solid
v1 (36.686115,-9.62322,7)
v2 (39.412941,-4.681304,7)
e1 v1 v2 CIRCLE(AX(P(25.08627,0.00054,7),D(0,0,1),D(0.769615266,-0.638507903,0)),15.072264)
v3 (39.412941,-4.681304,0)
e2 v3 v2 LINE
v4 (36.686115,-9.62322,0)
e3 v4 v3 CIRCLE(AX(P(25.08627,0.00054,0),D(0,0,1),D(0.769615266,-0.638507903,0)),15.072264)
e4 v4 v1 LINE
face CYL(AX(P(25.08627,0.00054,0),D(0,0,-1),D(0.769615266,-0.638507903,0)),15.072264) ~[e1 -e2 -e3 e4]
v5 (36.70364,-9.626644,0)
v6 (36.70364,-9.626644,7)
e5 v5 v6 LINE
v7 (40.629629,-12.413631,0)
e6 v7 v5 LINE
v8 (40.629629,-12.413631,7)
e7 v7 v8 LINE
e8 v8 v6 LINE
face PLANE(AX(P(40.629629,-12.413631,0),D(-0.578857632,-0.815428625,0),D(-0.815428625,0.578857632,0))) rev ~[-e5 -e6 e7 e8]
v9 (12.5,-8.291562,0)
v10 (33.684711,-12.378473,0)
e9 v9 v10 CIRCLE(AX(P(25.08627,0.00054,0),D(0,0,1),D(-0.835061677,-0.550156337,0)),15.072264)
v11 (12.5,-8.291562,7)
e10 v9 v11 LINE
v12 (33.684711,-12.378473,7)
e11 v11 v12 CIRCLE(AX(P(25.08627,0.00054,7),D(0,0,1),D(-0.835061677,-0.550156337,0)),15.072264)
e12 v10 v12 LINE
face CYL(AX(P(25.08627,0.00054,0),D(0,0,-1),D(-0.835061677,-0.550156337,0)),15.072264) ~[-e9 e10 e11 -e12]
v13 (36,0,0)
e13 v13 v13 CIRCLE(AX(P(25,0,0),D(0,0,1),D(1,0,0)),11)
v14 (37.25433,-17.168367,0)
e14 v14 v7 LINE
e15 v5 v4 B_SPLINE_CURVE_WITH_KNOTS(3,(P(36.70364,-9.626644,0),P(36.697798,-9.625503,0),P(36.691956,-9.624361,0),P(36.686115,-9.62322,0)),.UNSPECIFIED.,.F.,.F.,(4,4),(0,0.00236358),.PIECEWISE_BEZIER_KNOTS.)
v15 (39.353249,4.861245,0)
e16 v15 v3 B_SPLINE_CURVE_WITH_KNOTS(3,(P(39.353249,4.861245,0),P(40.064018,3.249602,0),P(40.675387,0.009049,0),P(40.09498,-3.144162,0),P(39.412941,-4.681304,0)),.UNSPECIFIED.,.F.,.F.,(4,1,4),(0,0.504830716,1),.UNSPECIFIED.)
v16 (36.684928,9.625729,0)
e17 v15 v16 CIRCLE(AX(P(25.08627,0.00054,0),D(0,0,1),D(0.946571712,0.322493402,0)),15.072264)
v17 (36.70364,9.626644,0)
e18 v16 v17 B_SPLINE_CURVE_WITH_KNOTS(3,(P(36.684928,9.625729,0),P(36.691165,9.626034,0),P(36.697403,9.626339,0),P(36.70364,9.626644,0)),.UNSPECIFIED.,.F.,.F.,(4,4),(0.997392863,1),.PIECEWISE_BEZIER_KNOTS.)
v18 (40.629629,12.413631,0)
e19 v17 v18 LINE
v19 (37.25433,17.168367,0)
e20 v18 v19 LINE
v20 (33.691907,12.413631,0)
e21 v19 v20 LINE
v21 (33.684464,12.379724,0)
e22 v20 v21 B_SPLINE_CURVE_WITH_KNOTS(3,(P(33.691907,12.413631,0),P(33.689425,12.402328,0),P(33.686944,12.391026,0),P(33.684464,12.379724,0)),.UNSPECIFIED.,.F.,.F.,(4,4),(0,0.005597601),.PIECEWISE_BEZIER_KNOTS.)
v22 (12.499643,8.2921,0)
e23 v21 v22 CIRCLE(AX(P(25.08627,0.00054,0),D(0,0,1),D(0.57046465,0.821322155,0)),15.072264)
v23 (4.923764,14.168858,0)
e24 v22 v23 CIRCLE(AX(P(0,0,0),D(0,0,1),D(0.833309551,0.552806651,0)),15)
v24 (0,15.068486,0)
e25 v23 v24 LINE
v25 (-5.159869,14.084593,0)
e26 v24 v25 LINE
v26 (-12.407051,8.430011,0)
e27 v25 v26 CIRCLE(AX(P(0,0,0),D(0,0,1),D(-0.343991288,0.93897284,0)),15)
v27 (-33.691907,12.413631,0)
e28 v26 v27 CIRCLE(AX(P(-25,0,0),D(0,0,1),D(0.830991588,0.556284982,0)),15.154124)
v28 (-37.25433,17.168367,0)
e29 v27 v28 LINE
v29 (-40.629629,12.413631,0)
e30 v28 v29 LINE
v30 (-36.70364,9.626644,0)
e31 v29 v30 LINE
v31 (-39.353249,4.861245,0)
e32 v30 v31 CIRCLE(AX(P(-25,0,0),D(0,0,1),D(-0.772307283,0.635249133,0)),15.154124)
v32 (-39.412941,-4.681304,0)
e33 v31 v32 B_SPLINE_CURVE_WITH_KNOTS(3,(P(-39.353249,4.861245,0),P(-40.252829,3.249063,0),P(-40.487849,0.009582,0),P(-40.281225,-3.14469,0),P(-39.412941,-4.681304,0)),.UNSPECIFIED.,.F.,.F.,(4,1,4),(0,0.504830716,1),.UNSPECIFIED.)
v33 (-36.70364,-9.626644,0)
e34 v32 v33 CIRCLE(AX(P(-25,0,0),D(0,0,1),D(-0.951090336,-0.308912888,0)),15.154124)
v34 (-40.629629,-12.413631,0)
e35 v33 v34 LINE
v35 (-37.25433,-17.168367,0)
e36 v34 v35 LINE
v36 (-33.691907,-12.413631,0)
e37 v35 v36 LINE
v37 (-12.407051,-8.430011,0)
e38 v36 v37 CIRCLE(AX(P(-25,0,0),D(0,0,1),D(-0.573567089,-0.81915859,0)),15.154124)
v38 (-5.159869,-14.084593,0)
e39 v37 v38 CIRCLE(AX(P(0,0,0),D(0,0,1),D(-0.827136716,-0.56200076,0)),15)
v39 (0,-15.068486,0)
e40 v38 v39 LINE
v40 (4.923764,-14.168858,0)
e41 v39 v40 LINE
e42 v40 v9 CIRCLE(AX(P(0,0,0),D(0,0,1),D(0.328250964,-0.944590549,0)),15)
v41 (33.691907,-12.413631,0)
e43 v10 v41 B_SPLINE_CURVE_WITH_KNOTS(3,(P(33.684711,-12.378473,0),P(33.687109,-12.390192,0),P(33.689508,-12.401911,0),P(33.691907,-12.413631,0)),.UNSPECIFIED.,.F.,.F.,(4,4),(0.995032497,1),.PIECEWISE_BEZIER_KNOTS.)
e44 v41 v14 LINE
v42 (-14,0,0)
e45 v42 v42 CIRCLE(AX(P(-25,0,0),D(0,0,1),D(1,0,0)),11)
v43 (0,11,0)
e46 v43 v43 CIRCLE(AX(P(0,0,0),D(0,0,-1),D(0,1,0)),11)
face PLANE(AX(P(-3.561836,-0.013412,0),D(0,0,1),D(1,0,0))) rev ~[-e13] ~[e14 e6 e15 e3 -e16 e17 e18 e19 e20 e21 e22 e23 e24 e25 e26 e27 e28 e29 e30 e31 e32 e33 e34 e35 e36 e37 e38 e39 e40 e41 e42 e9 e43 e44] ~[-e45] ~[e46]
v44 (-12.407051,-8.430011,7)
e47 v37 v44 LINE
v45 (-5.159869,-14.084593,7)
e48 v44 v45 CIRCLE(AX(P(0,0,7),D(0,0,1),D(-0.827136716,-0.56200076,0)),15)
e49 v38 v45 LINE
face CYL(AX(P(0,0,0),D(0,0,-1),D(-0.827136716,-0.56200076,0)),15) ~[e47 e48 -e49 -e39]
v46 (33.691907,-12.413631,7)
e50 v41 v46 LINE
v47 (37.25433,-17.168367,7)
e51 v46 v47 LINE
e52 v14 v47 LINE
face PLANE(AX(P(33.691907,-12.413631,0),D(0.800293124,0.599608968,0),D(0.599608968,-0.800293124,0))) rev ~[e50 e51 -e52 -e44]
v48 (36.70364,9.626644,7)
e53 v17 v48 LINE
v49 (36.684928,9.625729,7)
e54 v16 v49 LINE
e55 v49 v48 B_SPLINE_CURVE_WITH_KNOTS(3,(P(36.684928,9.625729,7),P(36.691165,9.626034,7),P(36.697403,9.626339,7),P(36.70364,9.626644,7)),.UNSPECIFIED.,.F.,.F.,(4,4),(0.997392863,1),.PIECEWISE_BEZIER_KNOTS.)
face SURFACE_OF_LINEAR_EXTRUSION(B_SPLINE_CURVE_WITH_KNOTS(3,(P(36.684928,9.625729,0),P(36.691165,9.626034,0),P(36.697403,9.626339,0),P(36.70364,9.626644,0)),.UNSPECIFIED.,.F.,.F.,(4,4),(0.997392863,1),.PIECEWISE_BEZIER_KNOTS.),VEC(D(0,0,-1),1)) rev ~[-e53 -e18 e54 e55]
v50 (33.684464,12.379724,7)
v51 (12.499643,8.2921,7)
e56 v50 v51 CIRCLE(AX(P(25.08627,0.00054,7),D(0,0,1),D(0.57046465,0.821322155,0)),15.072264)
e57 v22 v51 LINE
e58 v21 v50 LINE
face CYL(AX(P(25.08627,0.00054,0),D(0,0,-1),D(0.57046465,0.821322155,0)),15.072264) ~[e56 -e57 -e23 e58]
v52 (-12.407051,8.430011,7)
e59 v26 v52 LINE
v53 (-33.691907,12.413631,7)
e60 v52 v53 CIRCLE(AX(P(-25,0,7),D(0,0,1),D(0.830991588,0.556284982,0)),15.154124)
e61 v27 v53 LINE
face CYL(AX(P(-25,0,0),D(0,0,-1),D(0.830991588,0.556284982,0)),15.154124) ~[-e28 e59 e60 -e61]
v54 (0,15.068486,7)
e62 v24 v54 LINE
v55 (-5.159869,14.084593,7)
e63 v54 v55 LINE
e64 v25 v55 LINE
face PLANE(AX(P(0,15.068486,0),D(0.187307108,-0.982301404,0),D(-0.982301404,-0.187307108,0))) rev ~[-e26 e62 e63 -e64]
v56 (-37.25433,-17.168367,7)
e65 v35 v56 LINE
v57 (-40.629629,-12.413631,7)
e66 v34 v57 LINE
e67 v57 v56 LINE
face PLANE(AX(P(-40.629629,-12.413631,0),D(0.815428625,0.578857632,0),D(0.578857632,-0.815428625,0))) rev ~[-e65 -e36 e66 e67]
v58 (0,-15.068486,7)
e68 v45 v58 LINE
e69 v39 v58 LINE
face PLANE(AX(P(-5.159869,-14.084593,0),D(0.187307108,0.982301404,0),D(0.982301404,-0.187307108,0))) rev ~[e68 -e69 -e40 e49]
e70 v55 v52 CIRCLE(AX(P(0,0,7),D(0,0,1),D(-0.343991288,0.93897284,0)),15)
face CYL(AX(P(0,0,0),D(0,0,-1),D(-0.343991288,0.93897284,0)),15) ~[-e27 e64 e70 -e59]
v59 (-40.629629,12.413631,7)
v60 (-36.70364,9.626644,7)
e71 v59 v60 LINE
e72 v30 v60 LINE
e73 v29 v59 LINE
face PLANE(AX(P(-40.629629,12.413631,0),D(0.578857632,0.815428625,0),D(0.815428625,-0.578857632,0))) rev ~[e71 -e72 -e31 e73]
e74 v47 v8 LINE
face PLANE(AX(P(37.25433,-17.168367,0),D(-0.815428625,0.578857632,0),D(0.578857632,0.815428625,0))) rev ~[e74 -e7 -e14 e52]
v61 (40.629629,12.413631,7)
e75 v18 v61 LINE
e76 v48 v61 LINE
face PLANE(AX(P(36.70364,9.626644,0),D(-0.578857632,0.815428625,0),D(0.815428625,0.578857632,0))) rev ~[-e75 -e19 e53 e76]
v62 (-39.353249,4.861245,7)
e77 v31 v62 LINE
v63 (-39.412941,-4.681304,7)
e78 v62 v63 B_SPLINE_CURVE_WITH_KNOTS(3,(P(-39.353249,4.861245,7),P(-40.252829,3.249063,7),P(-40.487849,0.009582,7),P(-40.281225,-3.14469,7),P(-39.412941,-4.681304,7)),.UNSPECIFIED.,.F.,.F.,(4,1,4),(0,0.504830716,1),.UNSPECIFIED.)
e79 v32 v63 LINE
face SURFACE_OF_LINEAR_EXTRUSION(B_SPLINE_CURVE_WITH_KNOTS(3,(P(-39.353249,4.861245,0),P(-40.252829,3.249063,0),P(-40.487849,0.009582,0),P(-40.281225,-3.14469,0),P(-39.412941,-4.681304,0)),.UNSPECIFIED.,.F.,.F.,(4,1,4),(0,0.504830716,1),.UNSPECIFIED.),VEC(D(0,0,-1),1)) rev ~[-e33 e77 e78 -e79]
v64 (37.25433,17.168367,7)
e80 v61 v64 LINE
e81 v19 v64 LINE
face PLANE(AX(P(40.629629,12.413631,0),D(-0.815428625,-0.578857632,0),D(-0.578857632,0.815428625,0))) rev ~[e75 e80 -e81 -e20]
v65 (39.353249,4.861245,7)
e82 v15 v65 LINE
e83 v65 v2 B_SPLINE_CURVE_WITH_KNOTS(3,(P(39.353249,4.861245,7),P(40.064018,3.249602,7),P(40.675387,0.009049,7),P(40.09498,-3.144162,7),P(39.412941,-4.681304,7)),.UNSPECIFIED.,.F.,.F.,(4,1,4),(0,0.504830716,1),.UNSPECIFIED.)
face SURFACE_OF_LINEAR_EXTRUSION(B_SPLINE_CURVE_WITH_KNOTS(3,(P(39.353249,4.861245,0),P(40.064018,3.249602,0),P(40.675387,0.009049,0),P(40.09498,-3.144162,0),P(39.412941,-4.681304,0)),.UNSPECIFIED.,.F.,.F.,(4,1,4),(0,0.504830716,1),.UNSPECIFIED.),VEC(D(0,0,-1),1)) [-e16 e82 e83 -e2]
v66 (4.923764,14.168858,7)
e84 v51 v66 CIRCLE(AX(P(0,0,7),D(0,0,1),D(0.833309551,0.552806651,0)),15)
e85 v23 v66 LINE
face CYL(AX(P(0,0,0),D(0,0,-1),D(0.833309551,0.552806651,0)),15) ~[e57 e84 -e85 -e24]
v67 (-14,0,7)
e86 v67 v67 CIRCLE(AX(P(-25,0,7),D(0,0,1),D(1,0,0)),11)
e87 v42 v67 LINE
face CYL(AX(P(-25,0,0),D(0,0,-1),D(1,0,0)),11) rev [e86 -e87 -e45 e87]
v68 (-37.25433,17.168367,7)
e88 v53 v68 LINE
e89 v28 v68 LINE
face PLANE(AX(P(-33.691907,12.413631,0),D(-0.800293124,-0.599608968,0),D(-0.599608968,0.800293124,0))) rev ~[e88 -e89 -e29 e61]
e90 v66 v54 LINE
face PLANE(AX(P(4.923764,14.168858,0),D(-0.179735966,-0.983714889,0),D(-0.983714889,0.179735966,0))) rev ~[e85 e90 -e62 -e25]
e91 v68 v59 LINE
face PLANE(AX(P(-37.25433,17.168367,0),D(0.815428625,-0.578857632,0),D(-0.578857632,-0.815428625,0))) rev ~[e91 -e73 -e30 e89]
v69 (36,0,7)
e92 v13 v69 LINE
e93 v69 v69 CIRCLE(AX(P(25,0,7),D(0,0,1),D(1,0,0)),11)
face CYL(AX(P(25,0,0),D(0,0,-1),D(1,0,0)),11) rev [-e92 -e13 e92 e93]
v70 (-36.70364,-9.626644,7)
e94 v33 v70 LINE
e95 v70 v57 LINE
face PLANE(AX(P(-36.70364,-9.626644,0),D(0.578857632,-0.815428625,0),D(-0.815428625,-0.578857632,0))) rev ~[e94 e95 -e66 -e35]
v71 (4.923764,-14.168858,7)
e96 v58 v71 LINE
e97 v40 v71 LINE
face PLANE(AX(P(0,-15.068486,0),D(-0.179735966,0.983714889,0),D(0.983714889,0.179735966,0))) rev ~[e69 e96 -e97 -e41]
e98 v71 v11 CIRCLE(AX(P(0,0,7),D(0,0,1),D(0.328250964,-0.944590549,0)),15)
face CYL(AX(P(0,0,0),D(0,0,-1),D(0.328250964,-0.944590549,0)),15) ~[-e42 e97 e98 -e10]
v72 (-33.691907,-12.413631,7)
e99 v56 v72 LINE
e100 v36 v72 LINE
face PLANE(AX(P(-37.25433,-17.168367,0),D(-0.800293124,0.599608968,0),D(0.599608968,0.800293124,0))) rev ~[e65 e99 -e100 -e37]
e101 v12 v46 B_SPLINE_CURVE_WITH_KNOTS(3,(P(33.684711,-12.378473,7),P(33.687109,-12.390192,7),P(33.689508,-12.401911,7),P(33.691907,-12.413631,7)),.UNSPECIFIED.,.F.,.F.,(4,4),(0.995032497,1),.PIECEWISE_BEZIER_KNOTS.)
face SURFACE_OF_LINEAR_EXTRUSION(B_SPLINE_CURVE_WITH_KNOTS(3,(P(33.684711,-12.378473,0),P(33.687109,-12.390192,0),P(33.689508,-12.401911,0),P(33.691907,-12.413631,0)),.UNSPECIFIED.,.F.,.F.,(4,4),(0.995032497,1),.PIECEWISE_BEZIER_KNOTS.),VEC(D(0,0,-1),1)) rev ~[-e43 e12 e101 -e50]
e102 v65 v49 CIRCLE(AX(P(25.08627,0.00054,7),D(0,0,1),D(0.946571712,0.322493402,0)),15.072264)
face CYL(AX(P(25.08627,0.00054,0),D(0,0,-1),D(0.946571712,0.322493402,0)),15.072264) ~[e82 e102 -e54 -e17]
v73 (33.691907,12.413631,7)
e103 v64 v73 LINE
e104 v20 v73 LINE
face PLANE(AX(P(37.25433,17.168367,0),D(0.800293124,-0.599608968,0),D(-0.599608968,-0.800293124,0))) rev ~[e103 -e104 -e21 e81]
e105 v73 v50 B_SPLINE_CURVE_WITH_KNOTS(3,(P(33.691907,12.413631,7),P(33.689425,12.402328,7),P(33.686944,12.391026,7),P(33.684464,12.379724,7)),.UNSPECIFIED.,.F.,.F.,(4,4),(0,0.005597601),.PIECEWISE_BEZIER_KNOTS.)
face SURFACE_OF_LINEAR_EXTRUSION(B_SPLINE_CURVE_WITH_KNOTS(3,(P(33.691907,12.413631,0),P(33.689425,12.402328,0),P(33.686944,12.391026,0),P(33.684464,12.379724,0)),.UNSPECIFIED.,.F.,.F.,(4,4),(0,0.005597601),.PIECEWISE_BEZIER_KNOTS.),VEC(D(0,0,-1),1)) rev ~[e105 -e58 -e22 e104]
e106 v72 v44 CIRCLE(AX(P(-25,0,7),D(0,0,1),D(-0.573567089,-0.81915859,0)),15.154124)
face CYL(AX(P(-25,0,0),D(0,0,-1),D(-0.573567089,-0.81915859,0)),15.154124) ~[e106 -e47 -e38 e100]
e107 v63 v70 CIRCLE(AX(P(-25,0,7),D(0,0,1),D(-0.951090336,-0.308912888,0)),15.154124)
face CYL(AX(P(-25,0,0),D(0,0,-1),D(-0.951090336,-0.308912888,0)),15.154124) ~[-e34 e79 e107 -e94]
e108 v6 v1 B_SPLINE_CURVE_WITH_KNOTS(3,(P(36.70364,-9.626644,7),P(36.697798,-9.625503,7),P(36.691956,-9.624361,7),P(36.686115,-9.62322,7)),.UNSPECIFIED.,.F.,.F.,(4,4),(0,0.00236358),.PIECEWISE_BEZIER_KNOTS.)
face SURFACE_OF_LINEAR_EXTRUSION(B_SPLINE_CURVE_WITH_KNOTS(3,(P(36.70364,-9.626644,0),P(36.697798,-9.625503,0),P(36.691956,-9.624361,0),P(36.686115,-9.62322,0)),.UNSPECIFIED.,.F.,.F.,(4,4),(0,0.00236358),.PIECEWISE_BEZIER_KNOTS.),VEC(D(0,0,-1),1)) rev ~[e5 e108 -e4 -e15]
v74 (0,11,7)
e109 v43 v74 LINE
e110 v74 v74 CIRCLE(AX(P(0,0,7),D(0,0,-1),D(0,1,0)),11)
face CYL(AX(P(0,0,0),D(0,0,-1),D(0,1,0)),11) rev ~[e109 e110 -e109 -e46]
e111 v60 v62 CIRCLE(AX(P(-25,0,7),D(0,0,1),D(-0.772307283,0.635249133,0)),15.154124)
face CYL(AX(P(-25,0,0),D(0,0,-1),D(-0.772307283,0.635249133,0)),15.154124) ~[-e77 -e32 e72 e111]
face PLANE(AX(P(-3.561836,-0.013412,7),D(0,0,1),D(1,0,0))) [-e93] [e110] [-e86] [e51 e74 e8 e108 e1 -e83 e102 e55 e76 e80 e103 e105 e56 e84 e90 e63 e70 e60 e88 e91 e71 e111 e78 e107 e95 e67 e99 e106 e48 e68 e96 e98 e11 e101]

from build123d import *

# Parameters (mm, degrees)
F0_R     = 11
F1_DEPTH = 7


# Not quite as in the source:
# - a feature of the source that left no trace in its solid (it failed there, or was rolled back) is left out


with BuildPart() as f1:
    # F0 (on Top) → F1 (new body)
    with BuildSketch(Plane.XY):
        with BuildLine():
            ThreePointArc((-33.6919065778, -12.4136305481), (-22.2121981946, -14.8954900703), (-12.4070507332, -8.4300113941))
            ThreePointArc((-12.4070507332, -8.4300113941), (-9.2272824926, -11.8261260691), (-5.1598693222, -14.0845925954))
            Line((-5.1598693222, -14.0845925954), (0, -15.0684863329))
            Line((0, -15.0684863329), (4.9237644598, -14.1688582301))
            ThreePointArc((4.9237644598, -14.1688582301), (9.1941581889, -11.851896692), (12.5, -8.2915619759))
            ThreePointArc((12.5, -8.2915619759), (22.2312035836, -14.7988434658), (33.6847114379, -12.378472956))
            add(Edge.make_bspline(
                [(36.6861147035, -9.6232201138), (35.4322184653, -9.3782649416), (32.9856759013, -8.9056095075), (33.4504308992, -11.233519818), (33.6847114379, -12.378472956)],
                knots=[0.0023635799, 0.0023635799, 0.0023635799, 0.0023635799, 0.5096931431, 0.9950324973, 0.9950324973, 0.9950324973, 0.9950324973], degree=3))
            ThreePointArc((36.6861147035, -9.6232201138), (38.2829241904, -7.281044503), (39.4129405486, -4.6813041007))
            add(Edge.make_bspline(
                [(39.3532489974, 4.8612453714), (40.0640178656, 3.2496024167), (40.675386779, 0.0090485332), (40.094980448, -3.1441618112), (39.4129405486, -4.6813041007)],
                knots=[0, 0, 0, 0, 0.5048307155, 1, 1, 1, 1], degree=3))
            ThreePointArc((39.3532489974, 4.8612453714), (38.2366644679, 7.3653393625), (36.6849282767, 9.6257292672))
            add(Edge.make_bspline(
                [(33.6844640266, 12.3797240959), (33.4791642411, 11.4442056961), (33.0552816759, 9.4534774659), (35.4207112642, 9.5639432605), (36.6849282767, 9.6257292672)],
                knots=[0.0055976008, 0.0055976008, 0.0055976008, 0.0055976008, 0.4689523637, 0.9973928627, 0.9973928627, 0.9973928627, 0.9973928627], degree=3))
            ThreePointArc((33.6844640266, 12.3797240959), (22.2307373346, 14.7998328025), (12.4996432587, 8.2920997584))
            ThreePointArc((12.4996432587, 8.2920997584), (9.1939032334, 11.8520944704), (4.9237644598, 14.1688582301))
            Line((4.9237644598, 14.1688582301), (0, 15.0684863329))
            Line((0, 15.0684863329), (-5.1598693222, 14.0845925954))
            ThreePointArc((-5.1598693222, 14.0845925954), (-9.2272824926, 11.8261260691), (-12.4070507332, 8.4300113941))
            ThreePointArc((-12.4070507332, 8.4300113941), (-22.2121981946, 14.8954900703), (-33.6919065778, 12.4136305481))
            Line((-33.6919065778, 12.4136305481), (-37.2543297708, 17.1683672816))
            Line((-37.2543297708, 17.1683672816), (-40.6296290457, 12.4136305481))
            Line((-40.6296290457, 12.4136305481), (-36.703640056, 9.6266439002))
            ThreePointArc((-36.703640056, 9.6266439002), (-38.2445317988, 7.3640913066), (-39.3532489974, 4.8612453714))
            add(Edge.make_bspline(
                [(-39.3532489974, 4.8612453714), (-40.2528289587, 3.2490634103), (-40.4878486023, 0.0095823751), (-40.2812252759, -3.1446904889), (-39.4129405486, -4.6813041007)],
                knots=[0, 0, 0, 0, 0.5048307155, 1, 1, 1, 1], degree=3))
            ThreePointArc((-39.4129405486, -4.6813041007), (-38.2903364161, -7.2811002801), (-36.703640056, -9.6266439002))
            Line((-36.703640056, -9.6266439002), (-40.6296290457, -12.4136305481))
            Line((-40.6296290457, -12.4136305481), (-37.2543297708, -17.1683672816))
            Line((-37.2543297708, -17.1683672816), (-33.6919065778, -12.4136305481))
        make_face()
        with Locations((-25, 0)):
            Circle(F0_R, mode=Mode.SUBTRACT)
        with BuildLine():
            ThreePointArc((0, -11), (-11, 0), (0, 11))
            ThreePointArc((0, 11), (11, 0), (0, -11))
        make_face(mode=Mode.SUBTRACT)
        with Locations((25, 0)):
            Circle(F0_R, mode=Mode.SUBTRACT)
        with BuildLine():
            ThreePointArc((33.8754488345, -12.2437849019), (33.7803409626, -12.3114982961), (33.6847114379, -12.378472956))
            add(Edge.make_bspline(
                [(33.6847114379, -12.378472956), (33.6871093254, -12.3901916797), (33.6895079516, -12.4019111139), (33.6919065778, -12.4136305481)],
                knots=[0.9950324973, 0.9950324973, 0.9950324973, 0.9950324973, 1, 1, 1, 1], degree=3))
            Line((33.6919065778, -12.4136305481), (33.8754488345, -12.2437849019))
        make_face()
        with BuildLine():
            add(Edge.make_bspline(
                [(36.6861147035, -9.6232201138), (35.4322184653, -9.3782649416), (32.9856759013, -8.9056095075), (33.4504308992, -11.233519818), (33.6847114379, -12.378472956)],
                knots=[0.0023635799, 0.0023635799, 0.0023635799, 0.0023635799, 0.5096931431, 0.9950324973, 0.9950324973, 0.9950324973, 0.9950324973], degree=3))
            ThreePointArc((33.6847114379, -12.378472956), (33.7803409626, -12.3114982961), (33.8754488345, -12.2437849019))
            Line((33.8754488345, -12.2437849019), (33.6919065778, -12.4136305481))
            Line((33.6919065778, -12.4136305481), (37.2543297708, -17.1683672816))
            Line((37.2543297708, -17.1683672816), (40.6296290457, -12.4136305481))
            Line((40.6296290457, -12.4136305481), (36.703640056, -9.6266439002))
            Line((36.703640056, -9.6266439002), (36.6135832636, -9.7099803175))
            ThreePointArc((36.6135832636, -9.7099803175), (36.6499303523, -9.6666682398), (36.6861147035, -9.6232201138))
        make_face()
        with BuildLine():
            add(Edge.make_bspline(
                [(36.703640056, -9.6266439002), (36.6977982463, -9.6255026135), (36.6919564367, -9.6243613269), (36.6861147035, -9.6232201138)],
                knots=[0, 0, 0, 0, 0.0023635799, 0.0023635799, 0.0023635799, 0.0023635799], degree=3))
            ThreePointArc((36.6861147035, -9.6232201138), (36.6499303523, -9.6666682398), (36.6135832636, -9.7099803175))
            Line((36.6135832636, -9.7099803175), (36.703640056, -9.6266439002))
        make_face()
        with BuildLine():
            ThreePointArc((36.6176990871, 9.7061716321), (36.6513836228, 9.6660089023), (36.6849282767, 9.6257292672))
            add(Edge.make_bspline(
                [(36.6849282767, 9.6257292672), (36.6911654734, 9.6260340973), (36.6974027647, 9.6263389988), (36.703640056, 9.6266439002)],
                knots=[0.9973928627, 0.9973928627, 0.9973928627, 0.9973928627, 1, 1, 1, 1], degree=3))
            Line((36.703640056, 9.6266439002), (36.6176990871, 9.7061716321))
        make_face()
        with BuildLine():
            add(Edge.make_bspline(
                [(33.6844640266, 12.3797240959), (33.4791642411, 11.4442056961), (33.0552816759, 9.4534774659), (35.4207112642, 9.5639432605), (36.6849282767, 9.6257292672)],
                knots=[0.0055976008, 0.0055976008, 0.0055976008, 0.0055976008, 0.4689523637, 0.9973928627, 0.9973928627, 0.9973928627, 0.9973928627], degree=3))
            ThreePointArc((36.6849282767, 9.6257292672), (36.6513836228, 9.6660089023), (36.6176990871, 9.7061716321))
            Line((36.6176990871, 9.7061716321), (36.703640056, 9.6266439002))
            Line((36.703640056, 9.6266439002), (40.6296290457, 12.4136305481))
            Line((40.6296290457, 12.4136305481), (37.2543297708, 17.1683672816))
            Line((37.2543297708, 17.1683672816), (33.6919065778, 12.4136305481))
            Line((33.6919065778, 12.4136305481), (33.8702569567, 12.2485893424))
            ThreePointArc((33.8702569567, 12.2485893424), (33.777607815, 12.3145071292), (33.6844640266, 12.3797240959))
        make_face()
        with BuildLine():
            add(Edge.make_bspline(
                [(33.6919065778, 12.4136305481), (33.6894253739, 12.4023281311), (33.68694417, 12.391025714), (33.6844640266, 12.3797240959)],
                knots=[0, 0, 0, 0, 0.0055976008, 0.0055976008, 0.0055976008, 0.0055976008], degree=3))
            ThreePointArc((33.6844640266, 12.3797240959), (33.777607815, 12.3145071292), (33.8702569567, 12.2485893424))
            Line((33.8702569567, 12.2485893424), (33.6919065778, 12.4136305481))
        make_face()
    extrude(amount=F1_DEPTH)


solid = f1.part
